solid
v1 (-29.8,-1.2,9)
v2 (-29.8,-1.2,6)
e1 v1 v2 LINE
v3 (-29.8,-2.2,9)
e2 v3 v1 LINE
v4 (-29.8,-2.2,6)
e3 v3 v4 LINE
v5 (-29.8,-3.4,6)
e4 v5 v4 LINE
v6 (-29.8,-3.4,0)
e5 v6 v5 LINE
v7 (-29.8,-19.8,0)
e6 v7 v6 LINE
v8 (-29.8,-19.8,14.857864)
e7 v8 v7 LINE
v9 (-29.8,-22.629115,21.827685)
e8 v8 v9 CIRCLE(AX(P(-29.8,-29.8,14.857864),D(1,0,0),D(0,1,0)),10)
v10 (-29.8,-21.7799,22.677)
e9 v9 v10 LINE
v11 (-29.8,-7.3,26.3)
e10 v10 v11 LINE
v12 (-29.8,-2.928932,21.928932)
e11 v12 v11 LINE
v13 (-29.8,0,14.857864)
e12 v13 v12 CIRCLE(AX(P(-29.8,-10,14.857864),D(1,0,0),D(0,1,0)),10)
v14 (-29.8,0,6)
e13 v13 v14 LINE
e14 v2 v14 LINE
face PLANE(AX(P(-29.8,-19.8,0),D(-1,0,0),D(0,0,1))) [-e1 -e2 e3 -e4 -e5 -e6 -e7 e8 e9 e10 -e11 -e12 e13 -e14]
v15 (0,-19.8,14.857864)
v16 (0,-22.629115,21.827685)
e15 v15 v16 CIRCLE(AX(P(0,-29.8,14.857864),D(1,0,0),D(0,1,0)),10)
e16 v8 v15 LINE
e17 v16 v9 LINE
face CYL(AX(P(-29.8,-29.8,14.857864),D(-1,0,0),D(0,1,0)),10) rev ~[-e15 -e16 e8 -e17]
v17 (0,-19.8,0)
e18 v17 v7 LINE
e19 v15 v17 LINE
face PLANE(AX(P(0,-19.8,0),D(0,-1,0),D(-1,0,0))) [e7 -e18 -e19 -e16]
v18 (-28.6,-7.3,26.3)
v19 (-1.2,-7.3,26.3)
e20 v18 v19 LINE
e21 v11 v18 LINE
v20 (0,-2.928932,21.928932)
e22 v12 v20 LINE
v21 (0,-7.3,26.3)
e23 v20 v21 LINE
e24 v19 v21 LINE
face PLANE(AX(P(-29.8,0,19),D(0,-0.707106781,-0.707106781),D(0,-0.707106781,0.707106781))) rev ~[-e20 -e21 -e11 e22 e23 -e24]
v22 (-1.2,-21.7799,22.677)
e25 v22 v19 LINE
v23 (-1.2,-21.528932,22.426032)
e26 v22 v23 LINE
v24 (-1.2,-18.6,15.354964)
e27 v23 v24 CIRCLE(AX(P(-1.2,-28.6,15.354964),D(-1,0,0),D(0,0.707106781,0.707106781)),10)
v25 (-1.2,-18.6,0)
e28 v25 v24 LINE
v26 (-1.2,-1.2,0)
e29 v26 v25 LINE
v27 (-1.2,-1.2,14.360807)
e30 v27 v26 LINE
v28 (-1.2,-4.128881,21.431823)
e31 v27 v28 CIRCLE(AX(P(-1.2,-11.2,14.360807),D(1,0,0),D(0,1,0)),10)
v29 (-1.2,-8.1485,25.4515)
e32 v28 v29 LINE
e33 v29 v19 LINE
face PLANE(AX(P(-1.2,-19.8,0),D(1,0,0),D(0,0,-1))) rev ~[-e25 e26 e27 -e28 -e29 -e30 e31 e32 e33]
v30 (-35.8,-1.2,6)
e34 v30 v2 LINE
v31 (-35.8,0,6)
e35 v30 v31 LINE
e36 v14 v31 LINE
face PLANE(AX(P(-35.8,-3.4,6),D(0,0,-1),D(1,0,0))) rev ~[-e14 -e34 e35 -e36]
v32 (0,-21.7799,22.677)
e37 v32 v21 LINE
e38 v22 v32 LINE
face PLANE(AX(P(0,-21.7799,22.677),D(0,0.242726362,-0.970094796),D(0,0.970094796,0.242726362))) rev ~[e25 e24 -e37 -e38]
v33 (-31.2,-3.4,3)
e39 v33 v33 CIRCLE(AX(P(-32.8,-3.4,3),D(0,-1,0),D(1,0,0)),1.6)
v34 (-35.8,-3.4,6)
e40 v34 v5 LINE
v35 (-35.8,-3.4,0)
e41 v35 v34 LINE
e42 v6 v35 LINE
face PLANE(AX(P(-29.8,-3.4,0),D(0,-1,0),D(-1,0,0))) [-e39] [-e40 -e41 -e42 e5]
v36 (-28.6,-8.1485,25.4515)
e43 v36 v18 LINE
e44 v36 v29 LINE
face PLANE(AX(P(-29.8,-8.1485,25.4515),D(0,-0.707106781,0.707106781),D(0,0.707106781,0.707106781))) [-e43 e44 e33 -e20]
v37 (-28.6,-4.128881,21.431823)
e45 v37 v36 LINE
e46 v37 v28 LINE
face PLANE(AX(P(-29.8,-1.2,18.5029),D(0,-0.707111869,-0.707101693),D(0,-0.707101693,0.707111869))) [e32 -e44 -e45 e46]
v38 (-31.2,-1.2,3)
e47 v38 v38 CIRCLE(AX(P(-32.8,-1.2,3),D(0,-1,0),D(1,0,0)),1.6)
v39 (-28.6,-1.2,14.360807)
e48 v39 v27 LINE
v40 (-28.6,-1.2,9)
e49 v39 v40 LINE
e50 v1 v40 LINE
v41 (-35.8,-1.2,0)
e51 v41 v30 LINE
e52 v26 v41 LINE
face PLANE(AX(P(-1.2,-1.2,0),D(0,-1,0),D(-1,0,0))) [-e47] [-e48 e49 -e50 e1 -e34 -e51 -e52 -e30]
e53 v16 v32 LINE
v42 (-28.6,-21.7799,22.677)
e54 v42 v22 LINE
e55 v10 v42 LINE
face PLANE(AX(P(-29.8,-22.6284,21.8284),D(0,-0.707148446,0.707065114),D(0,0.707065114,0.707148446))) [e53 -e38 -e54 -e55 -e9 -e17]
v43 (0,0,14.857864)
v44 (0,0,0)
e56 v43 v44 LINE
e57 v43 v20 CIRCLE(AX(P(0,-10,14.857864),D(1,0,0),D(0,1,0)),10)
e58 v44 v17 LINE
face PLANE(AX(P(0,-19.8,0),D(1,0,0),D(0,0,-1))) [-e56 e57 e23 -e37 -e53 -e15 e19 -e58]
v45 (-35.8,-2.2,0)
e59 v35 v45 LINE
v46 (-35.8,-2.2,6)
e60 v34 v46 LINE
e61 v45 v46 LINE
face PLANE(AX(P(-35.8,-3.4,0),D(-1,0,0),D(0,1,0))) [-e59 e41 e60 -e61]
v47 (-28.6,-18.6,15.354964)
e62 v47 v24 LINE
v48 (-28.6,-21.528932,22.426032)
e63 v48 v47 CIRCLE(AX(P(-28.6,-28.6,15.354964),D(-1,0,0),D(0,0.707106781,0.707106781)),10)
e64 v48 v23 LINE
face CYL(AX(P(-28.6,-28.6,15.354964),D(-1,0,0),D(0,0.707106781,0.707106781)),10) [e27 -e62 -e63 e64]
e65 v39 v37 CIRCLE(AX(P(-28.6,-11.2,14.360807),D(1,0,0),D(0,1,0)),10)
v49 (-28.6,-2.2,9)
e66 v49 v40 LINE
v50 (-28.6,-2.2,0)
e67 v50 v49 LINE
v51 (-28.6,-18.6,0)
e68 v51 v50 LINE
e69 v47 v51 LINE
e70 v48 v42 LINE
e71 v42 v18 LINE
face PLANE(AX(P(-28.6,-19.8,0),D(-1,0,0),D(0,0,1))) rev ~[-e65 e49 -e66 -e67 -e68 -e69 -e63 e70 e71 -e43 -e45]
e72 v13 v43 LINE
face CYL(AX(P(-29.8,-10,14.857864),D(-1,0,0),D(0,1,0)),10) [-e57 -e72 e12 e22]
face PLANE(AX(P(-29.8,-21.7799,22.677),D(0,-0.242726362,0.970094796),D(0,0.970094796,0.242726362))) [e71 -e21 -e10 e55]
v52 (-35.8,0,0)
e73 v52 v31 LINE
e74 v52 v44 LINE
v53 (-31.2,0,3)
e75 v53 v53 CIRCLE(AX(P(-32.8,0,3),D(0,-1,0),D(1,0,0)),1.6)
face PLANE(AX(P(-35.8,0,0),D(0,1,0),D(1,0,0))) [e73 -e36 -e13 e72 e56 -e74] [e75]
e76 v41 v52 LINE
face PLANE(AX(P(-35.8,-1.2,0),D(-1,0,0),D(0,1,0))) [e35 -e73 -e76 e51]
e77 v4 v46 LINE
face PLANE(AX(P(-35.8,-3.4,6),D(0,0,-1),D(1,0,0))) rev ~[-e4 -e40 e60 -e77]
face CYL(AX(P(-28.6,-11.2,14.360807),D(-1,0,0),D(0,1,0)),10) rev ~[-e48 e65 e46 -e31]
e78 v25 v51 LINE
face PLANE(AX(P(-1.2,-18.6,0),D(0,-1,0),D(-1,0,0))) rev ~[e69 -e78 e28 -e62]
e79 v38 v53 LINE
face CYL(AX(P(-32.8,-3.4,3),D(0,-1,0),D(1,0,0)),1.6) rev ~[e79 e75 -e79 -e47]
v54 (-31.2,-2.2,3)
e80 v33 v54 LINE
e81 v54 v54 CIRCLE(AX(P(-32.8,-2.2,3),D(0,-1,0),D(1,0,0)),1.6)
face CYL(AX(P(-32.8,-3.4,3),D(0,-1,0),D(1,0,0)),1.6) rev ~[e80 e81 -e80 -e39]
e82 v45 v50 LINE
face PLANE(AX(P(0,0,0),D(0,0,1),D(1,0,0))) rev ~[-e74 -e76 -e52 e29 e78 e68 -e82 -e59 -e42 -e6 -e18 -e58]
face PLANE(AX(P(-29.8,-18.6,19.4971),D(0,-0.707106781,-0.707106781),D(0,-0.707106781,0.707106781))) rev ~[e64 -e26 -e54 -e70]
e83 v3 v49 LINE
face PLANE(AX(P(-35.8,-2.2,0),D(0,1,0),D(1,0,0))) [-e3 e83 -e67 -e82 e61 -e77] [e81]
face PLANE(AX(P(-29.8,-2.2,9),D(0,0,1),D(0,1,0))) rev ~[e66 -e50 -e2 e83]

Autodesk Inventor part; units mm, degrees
ref_plane "YZ Plane" through (0, 0, 0) normal (1, 0, 0) x (0, 1, 0)
ref_plane "XZ Plane" through (0, 0, 0) normal (0, 1, 0) x (-1, 0, 0)
ref_plane "XY Plane" through (0, 0, 0) normal (0, 0, 1) x (1, 0, 0)
sketch "Skizze1" plane through (0, 0, 0) normal (0, 0, 1) x (1, 0, 0)
  line L0 (-1.2, -1.2) -> (-1.2, -18.6)
  line L1 (-1.2, -18.6) -> (-28.6, -18.6)
  line L2 (-28.6, -18.6) -> (-28.6, -2.2)
  line L3 (0, 0) -> (0, -19.8)
  line L4 (0, -19.8) -> (-29.8, -19.8)
  line L5 (-29.8, -19.8) -> (-29.8, -3.4)
  line L6 (-29.8, -3.4) -> (-35.8, -3.4)
  line L7 (-35.8, -3.4) -> (-35.8, -2.2)
  line L8 (-35.8, -2.2) -> (-28.6, -2.2)
  line L9 (-1.2, -1.2) -> (-35.8, -1.2)
  line L10 (-35.8, -1.2) -> (-35.8, 0)
  line L11 (-35.8, 0) -> (0, 0)
  line L12 (0, -23.76) -> (0, 3.96) projected
  line L13 (-42.96, 0) -> (7.16, 0) projected
  point P0 (7.16, 0)
  dimension "d6" = 17.4
  dimension "d7" = 27.4
  dimension "d8" = 16.4
  dimension "d9" = 90
  dimension "d10" = 6
  dimension "d11" = 90
  dimension "d12" = 1.2
  dimension "d13" = 1.2
  dimension "d14" = 1.2
  dimension "d15" = 1.2
  dimension "d16" = 0
  dimension "d17" = 0
  dimension "d18" = 1.2
extrude "Extrusion1" add sketch "Skizze1" along normal blind 9
sketch "Skizze2" plane through (-35.8, -3.4, 0) normal (0, -1, 0) x (1, 0, 0)
  circle A0 centre (3, 3) radius 1.6
  line L0 (0, 9) -> (6, 9) projected
  line L1 (0, 0) -> (0, 9) projected
  line L2 (0, 0) -> (6, 0) projected
  line L3 (6, 9) -> (0, 9)
  line L4 (0, 9) -> (0, 6)
  line L5 (0, 6) -> (6, 6)
  line L6 (6, 6) -> (6, 9)
  point P0 (35.8, 0)
  dimension "d21" = 3.2
  dimension "d23" = 3
  dimension "d75" = 3
  dimension "d76" = 6
  dimension "d77" = 3
extrude "Extrusion2" cut sketch "Skizze2" against normal through all
sketch "Skizze15" plane through (-29.8, -19.8, 0) normal (-1, 0, 0) x (0, 0, 1)
  line L0 (9, 17.6) -> (9, 0) projected
  line L1 (9, 0) -> (19, 0)
  line L2 (9, 0) -> (19, 0) construction
  line L3 (19, 0) -> (21.8284, -2.8284)
  line L4 (21.8284, -2.8284) -> (22.677, -1.9799)
  line L5 (9, 1.2) -> (19.4971, 1.2)
  line L6 (19.4971, 1.2) -> (22.677, -1.9799)
  line L7 (6, 19.8) -> (9, 19.8) projected
  line L8 (9, 19.8) -> (9, 18.6) projected
  line L9 (9, 19.8) -> (9, 18.6)
  line L10 (9, 19.8) -> (19, 19.8)
  line L11 (9, 19.8) -> (19, 19.8) construction
  line L12 (19, 19.8) -> (26.3, 12.5)
  line L13 (9, 18.6) -> (6, 18.6) projected
  line L14 (9, 18.6) -> (18.5029, 18.6)
  line L15 (18.5029, 18.6) -> (25.4515, 11.6515)
  line L16 (25.4515, 11.6515) -> (26.3, 12.5)
  line L17 (28.3, -13.6) -> (28.3, -12.6) projected
  point P0 (0, 19.8)
  dimension "d78" = 10
  dimension "d79" = 0
  dimension "d80" = 4
  dimension "d81" = 135
  dimension "d82" = 1.2
  dimension "d83" = 0
  dimension "d84" = 10
  dimension "d85" = 0
  dimension "d86" = 135
  dimension "d87" = 2
  dimension "d88" = 1.2
extrude "Extrusion8" add sketch "Skizze15" against normal up to surface (29.8 mm away)
sketch "Skizze16" plane through (0, -19.8, 0) normal (1, 0, 0) x (0, 0, -1)
  line L0 (-22.677, -1.9799) -> (-19.4971, 1.2) projected
  line L1 (-19.4971, 1.2) -> (-9, 1.2) projected
  line L2 (-9, 1.2) -> (-9, 18.6) projected
  line L3 (-9, 18.6) -> (-18.5029, 18.6) projected
  line L4 (-18.5029, 18.6) -> (-25.4515, 11.6515) projected
  line L5 (-25.4515, 11.6515) -> (-26.3, 12.5) projected
  line L6 (-25.4515, 11.6515) -> (-26.3, 12.5) projected
  line L7 (-22.677, -1.9799) -> (-26.3, 12.5)
  point P0 (0, 19.8)
extrude "Extrusion9" add sketch "Skizze16" against normal up to surface (1.2 mm away)
sketch "Skizze17" plane through (-29.8, -19.8, 0) normal (-1, 0, 0) x (0, 0, 1)
  line L0 (9, 17.6) -> (9, 1.2) projected
  line L1 (9, 1.2) -> (19.4971, 1.2) projected
  line L2 (19.4971, 1.2) -> (22.677, -1.9799) projected
  line L3 (25.4515, 11.6515) -> (26.3, 12.5) projected
  line L4 (18.5029, 18.6) -> (25.4515, 11.6515) projected
  line L5 (18.5029, 18.6) -> (6, 18.6) projected
  line L6 (9, 17.6) -> (9, 18.6)
  line L7 (22.677, -1.9799) -> (26.3, 12.5)
  point P0 (0, 19.8)
extrude "Extrusion10" add sketch "Skizze17" against normal up to surface (1.2 mm away)
fillet "Rundung1" radius 10 4 edges at (-14.9, -19.8, 19) (-14.9, 0, 19) (-14.9, -18.6, 19.4971) (-14.9, -1.2, 18.5029)
properties part number "shroud 01 volcano" material "ABS-Kunststoff"
